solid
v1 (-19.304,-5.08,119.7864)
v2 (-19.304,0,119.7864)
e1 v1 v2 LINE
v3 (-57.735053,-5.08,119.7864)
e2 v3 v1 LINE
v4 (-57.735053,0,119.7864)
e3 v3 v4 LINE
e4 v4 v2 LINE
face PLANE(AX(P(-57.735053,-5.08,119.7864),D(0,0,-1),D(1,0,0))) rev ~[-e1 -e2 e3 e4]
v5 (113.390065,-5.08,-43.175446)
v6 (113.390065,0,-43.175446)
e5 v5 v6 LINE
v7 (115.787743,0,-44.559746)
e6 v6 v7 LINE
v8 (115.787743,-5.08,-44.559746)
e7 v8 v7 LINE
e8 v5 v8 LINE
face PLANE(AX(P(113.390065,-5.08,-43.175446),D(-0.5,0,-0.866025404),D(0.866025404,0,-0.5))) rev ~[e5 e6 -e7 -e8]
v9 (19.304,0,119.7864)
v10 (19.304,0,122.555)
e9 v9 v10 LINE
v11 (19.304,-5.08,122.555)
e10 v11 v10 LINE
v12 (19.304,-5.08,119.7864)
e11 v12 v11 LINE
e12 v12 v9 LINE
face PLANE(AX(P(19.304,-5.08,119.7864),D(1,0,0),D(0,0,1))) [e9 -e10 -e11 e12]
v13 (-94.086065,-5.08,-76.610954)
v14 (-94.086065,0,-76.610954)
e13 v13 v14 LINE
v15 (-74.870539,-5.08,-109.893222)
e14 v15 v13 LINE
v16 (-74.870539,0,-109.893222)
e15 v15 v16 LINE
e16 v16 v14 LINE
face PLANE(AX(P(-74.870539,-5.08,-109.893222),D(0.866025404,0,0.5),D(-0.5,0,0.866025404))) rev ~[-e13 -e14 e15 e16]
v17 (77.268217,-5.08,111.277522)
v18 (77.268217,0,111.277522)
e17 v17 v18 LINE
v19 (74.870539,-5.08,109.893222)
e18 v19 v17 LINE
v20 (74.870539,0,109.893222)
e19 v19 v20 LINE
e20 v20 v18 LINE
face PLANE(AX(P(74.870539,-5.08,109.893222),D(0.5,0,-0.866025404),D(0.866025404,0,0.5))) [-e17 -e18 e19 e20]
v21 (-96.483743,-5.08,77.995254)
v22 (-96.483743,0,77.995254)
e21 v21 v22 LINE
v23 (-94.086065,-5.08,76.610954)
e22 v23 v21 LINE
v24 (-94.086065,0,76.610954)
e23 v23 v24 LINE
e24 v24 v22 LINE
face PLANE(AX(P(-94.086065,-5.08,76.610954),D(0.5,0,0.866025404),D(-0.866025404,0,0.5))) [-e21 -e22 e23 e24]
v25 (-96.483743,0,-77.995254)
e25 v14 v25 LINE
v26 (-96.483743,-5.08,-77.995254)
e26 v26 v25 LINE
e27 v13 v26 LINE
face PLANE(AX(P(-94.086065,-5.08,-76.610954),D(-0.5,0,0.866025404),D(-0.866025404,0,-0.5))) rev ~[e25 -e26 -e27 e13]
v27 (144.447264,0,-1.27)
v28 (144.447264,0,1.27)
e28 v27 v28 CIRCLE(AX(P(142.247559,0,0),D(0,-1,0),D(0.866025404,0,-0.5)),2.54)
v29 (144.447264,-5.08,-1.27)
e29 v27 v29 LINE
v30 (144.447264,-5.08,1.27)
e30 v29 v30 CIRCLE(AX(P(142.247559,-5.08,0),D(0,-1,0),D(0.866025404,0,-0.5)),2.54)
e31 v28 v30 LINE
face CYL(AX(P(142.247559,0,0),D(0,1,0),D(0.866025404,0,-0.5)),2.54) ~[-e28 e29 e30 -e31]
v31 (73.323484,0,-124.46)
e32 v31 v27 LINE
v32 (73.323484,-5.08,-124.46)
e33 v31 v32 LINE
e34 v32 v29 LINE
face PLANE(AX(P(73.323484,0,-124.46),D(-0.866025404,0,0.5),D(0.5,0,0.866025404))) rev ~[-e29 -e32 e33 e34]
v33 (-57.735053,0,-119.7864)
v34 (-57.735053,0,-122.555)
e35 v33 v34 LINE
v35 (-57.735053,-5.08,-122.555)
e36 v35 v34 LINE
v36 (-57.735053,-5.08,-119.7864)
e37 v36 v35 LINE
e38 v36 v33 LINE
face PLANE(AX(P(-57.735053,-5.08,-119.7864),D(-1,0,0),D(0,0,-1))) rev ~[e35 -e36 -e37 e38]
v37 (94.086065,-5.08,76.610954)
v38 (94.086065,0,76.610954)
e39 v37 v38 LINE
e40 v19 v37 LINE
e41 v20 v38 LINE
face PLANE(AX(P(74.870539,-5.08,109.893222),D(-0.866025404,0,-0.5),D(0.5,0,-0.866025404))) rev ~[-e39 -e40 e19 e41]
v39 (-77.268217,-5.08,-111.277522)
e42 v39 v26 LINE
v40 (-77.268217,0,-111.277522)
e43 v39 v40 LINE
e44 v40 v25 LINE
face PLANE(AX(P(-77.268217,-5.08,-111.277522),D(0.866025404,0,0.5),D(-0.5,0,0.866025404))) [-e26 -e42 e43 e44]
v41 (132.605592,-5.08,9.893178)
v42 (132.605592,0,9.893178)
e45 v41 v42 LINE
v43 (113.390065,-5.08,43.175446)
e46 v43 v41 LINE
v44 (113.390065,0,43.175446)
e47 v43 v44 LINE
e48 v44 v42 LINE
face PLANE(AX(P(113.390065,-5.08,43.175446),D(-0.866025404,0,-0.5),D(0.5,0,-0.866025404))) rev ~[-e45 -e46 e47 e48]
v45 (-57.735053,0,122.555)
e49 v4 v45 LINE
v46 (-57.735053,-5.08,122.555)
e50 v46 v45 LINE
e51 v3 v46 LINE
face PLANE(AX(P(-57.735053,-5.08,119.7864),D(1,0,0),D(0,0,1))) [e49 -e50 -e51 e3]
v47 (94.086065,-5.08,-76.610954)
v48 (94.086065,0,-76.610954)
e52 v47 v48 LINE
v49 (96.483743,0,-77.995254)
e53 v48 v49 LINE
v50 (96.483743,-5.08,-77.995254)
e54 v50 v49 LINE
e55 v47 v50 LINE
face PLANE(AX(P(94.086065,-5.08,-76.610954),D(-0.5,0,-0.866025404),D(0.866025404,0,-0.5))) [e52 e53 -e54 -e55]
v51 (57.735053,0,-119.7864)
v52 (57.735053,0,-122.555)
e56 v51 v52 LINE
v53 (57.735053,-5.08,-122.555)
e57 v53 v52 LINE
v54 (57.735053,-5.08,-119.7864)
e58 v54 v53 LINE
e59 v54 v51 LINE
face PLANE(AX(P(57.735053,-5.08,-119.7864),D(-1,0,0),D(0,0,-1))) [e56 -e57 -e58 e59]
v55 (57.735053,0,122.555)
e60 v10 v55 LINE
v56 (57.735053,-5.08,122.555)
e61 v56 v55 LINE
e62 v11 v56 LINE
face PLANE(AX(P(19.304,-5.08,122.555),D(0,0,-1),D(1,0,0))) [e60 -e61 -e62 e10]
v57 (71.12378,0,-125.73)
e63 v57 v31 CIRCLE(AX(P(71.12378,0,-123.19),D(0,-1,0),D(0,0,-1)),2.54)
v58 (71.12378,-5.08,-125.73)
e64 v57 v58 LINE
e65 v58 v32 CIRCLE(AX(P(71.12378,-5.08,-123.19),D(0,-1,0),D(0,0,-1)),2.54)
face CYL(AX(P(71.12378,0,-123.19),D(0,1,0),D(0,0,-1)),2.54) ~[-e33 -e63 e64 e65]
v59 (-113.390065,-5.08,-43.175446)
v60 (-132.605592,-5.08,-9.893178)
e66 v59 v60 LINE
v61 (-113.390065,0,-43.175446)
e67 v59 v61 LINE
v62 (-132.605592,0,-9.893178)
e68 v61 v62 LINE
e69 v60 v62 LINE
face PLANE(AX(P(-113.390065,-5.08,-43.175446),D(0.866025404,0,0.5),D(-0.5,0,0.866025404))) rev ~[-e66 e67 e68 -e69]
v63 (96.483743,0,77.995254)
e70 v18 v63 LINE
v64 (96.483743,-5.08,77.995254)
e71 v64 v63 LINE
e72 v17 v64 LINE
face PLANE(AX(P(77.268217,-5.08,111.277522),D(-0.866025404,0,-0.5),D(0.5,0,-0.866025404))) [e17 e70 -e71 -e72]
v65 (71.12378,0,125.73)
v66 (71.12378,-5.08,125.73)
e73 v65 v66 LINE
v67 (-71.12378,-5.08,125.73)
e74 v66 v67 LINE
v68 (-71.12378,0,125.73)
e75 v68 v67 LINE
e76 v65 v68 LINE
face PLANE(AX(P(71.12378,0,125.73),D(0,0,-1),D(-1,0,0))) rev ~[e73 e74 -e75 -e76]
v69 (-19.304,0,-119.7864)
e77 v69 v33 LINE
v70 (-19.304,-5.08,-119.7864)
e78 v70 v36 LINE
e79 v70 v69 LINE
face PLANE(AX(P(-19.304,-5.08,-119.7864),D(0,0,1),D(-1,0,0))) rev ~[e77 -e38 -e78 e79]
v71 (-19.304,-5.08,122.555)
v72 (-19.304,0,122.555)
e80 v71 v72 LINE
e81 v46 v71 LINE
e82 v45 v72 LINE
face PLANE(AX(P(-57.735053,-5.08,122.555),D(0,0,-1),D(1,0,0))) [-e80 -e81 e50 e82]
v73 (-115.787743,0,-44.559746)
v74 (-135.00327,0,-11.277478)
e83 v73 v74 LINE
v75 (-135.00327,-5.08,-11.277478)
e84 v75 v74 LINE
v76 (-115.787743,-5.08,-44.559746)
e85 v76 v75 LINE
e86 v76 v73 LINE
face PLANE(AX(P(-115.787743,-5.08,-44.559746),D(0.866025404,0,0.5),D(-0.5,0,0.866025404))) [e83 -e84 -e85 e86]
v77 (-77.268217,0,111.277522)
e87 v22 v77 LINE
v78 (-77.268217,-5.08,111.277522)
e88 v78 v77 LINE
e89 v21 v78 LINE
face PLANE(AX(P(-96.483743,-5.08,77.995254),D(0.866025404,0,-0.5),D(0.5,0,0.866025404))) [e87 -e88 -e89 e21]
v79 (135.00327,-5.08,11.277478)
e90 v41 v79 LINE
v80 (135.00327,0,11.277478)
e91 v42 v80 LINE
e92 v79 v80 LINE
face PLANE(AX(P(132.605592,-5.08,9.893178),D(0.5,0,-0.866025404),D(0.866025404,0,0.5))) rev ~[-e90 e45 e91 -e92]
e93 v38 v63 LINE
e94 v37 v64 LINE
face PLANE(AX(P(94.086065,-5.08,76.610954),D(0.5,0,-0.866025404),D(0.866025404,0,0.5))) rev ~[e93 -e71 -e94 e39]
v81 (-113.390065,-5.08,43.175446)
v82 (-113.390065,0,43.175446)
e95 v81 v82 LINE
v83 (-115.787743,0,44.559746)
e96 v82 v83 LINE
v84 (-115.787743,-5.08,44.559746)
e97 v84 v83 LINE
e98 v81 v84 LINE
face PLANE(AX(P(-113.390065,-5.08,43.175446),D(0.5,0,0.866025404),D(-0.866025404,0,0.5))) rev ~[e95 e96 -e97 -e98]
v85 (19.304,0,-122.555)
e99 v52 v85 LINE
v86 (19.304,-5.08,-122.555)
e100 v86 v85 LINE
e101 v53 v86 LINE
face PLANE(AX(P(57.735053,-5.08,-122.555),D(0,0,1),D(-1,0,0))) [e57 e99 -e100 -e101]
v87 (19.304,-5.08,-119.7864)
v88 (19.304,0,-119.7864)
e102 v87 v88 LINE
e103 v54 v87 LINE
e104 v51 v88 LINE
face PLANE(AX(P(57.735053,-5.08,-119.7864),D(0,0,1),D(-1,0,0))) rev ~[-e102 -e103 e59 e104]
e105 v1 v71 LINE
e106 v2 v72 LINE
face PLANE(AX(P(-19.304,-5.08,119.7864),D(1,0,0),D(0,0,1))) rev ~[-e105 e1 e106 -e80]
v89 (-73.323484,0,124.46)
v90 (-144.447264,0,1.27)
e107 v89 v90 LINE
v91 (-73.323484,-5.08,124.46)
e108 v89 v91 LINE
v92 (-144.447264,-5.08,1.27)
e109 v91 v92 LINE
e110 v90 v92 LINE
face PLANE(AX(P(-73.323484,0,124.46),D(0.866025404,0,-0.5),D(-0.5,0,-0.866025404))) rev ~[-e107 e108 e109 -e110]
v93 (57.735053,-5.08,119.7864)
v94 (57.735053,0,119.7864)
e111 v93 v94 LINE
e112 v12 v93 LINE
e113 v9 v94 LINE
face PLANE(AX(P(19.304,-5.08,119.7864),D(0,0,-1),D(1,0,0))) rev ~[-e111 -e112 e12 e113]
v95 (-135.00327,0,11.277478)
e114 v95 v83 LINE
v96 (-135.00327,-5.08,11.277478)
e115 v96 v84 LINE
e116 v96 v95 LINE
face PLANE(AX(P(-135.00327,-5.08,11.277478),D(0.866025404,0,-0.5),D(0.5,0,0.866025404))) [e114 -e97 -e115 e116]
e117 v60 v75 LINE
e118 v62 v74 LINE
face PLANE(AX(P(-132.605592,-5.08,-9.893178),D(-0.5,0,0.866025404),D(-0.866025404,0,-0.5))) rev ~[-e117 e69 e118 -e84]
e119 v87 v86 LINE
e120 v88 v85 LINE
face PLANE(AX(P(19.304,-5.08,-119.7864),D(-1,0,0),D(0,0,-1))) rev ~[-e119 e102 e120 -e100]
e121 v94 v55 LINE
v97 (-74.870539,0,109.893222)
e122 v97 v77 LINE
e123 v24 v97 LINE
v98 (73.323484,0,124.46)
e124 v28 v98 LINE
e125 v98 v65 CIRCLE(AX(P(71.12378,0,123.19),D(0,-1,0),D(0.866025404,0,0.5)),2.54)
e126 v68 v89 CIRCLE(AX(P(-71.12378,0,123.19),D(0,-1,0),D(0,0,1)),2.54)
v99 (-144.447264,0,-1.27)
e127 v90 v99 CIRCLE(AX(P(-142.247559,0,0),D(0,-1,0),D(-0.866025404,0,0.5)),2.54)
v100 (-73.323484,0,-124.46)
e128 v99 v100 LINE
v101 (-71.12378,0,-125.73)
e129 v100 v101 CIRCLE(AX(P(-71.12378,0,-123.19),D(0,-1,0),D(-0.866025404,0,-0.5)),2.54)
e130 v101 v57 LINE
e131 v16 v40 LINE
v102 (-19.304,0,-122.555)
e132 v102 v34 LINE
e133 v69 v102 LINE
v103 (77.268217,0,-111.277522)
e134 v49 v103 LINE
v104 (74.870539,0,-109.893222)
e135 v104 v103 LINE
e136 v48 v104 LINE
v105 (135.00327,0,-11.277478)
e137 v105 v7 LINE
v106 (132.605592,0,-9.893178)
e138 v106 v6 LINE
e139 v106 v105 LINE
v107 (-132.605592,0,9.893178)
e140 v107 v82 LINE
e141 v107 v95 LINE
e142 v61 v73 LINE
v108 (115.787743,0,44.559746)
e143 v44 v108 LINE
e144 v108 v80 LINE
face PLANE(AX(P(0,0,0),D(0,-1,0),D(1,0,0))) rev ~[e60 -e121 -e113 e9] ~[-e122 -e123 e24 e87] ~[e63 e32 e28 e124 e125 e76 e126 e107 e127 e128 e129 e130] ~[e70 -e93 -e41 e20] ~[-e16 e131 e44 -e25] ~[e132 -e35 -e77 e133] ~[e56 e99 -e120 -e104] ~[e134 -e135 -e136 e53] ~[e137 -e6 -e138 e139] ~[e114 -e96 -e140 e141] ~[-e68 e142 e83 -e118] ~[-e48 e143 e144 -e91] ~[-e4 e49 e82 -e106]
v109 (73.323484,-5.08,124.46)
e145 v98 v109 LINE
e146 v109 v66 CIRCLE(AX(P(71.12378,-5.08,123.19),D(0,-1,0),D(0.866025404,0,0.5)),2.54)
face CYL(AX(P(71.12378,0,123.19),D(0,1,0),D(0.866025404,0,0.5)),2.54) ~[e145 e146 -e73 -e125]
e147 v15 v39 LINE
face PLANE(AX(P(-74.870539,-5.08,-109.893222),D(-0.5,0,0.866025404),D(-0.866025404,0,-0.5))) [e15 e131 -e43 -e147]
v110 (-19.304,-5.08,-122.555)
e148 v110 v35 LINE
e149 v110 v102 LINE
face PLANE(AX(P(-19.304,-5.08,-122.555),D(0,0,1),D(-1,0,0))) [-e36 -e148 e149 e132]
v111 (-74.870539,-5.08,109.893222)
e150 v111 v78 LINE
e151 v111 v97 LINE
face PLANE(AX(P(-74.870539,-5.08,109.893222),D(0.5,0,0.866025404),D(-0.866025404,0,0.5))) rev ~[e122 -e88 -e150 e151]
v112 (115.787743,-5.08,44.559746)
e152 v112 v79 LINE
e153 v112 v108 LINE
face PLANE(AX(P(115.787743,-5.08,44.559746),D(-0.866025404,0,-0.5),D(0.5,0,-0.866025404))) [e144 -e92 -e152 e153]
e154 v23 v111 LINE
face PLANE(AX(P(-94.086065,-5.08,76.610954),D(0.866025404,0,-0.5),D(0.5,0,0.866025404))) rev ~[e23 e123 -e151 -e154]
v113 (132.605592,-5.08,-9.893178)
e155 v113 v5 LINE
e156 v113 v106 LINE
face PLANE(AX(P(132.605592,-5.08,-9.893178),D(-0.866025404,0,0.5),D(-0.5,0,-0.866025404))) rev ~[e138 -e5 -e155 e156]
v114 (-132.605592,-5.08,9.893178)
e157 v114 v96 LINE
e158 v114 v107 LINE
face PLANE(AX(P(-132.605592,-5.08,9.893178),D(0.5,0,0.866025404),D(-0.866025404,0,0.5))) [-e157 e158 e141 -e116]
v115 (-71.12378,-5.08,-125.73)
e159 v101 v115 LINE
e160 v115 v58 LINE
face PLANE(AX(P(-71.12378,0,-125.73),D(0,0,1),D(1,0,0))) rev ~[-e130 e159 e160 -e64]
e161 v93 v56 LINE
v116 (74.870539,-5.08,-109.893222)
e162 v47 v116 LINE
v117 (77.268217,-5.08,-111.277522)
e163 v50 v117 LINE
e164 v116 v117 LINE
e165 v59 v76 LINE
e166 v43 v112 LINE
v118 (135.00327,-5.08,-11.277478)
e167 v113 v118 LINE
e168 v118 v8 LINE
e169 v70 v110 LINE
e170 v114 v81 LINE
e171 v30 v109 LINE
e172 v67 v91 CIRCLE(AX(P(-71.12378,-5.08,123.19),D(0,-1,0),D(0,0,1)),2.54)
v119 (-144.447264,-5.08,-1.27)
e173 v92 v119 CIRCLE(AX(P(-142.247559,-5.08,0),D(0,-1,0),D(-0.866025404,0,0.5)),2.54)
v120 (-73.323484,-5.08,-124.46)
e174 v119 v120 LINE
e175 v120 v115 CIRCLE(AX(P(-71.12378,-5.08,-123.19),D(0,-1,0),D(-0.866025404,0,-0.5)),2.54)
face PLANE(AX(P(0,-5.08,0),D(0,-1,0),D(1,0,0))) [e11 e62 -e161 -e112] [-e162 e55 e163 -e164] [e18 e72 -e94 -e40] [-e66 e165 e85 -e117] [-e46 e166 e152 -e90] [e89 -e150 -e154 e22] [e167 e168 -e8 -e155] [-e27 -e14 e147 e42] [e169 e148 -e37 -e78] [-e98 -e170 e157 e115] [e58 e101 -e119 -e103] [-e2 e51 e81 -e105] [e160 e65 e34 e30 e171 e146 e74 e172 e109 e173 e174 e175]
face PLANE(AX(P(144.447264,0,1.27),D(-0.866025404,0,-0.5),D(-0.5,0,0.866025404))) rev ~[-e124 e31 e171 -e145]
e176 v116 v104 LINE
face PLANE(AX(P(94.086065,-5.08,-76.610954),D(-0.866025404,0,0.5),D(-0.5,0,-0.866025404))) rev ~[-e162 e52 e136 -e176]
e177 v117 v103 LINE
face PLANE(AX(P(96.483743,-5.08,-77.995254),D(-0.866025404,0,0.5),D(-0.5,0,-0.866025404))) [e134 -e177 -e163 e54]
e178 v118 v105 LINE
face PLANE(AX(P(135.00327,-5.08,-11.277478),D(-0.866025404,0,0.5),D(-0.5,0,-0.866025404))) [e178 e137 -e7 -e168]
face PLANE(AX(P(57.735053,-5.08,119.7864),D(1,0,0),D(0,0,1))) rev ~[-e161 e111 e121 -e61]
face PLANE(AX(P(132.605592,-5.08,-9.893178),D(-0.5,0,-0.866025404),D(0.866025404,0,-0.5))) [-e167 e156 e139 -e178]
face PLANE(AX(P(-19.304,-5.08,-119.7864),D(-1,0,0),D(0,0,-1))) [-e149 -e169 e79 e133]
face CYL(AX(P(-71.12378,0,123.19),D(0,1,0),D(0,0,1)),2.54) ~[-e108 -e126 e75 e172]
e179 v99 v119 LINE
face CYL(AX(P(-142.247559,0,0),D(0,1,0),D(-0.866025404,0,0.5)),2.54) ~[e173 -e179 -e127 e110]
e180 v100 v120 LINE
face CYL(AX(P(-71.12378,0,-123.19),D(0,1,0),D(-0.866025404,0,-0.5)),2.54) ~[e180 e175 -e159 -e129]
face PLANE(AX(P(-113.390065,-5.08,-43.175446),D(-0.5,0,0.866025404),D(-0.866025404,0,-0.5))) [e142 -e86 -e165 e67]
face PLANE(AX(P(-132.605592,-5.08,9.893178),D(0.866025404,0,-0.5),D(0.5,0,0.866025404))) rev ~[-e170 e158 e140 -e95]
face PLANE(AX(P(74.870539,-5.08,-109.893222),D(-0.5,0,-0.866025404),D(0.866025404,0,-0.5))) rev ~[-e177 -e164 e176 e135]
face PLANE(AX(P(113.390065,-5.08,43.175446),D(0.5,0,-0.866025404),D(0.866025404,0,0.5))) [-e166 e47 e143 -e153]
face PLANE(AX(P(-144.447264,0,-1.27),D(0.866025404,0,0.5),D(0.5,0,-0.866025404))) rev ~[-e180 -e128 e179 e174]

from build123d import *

# Parameters (mm, degrees)
F1_DEPTH        = 5.08
F2_W            = 38.4310525078
F2_H            = 2.7686
F3_DEPTH        = 5.08
F3_COPIES_COUNT = 6


# Not quite as in the source:
# - a pattern or mirror of a feature is missing from the dataset's text; its kind, count and spacing are read off the source's solid


with BuildPart() as f1:
    # F0 (on Front) → F1 (new body)
    with BuildSketch(Plane.XZ):
        with BuildLine():
            Line((71.1237796615, 125.73), (-71.1237796615, 125.73))
            ThreePointArc((-71.1237796615, 125.73), (-72.3937796615, 125.3897045256), (-73.3234841871, 124.46))
            Line((-73.3234841871, 124.46), (-144.4472638486, 1.27))
            ThreePointArc((-144.4472638486, 1.27), (-144.7875593229, 0), (-144.4472638486, -1.27))
            Line((-144.4472638486, -1.27), (-73.3234841871, -124.46))
            ThreePointArc((-73.3234841871, -124.46), (-72.3937796615, -125.3897045256), (-71.1237796615, -125.73))
            Line((-71.1237796615, -125.73), (71.1237796615, -125.73))
            ThreePointArc((71.1237796615, -125.73), (72.3937796615, -125.3897045256), (73.3234841871, -124.46))
            Line((73.3234841871, -124.46), (144.4472638486, -1.27))
            ThreePointArc((144.4472638486, -1.27), (144.7875593229, 0), (144.4472638486, 1.27))
            Line((144.4472638486, 1.27), (73.3234841871, 124.46))
            ThreePointArc((73.3234841871, 124.46), (72.3937796615, 125.3897045256), (71.1237796615, 125.73))
        make_face()
    extrude(amount=F1_DEPTH)

    # F2 (on face) → F3 (cut, through all)
    with BuildSketch(Plane.XZ.offset(5.08)):
        with Locations((-38.5195262539, 121.1707)):
            Rectangle(F2_W, F2_H)
        with Locations((38.5195262539, 121.1707)):
            Rectangle(F2_W, F2_H)
    f3 = extrude(amount=-F3_DEPTH, mode=Mode.SUBTRACT)

    # F3_copies: F3 ×6 about axis
    f3_copies_axis = Axis((0, 0, 0), (0, 1, 0))
    for i in range(1, F3_COPIES_COUNT):
        add(f3.rotate(f3_copies_axis, i * 360 / F3_COPIES_COUNT), mode=Mode.SUBTRACT)


solid = f1.part
